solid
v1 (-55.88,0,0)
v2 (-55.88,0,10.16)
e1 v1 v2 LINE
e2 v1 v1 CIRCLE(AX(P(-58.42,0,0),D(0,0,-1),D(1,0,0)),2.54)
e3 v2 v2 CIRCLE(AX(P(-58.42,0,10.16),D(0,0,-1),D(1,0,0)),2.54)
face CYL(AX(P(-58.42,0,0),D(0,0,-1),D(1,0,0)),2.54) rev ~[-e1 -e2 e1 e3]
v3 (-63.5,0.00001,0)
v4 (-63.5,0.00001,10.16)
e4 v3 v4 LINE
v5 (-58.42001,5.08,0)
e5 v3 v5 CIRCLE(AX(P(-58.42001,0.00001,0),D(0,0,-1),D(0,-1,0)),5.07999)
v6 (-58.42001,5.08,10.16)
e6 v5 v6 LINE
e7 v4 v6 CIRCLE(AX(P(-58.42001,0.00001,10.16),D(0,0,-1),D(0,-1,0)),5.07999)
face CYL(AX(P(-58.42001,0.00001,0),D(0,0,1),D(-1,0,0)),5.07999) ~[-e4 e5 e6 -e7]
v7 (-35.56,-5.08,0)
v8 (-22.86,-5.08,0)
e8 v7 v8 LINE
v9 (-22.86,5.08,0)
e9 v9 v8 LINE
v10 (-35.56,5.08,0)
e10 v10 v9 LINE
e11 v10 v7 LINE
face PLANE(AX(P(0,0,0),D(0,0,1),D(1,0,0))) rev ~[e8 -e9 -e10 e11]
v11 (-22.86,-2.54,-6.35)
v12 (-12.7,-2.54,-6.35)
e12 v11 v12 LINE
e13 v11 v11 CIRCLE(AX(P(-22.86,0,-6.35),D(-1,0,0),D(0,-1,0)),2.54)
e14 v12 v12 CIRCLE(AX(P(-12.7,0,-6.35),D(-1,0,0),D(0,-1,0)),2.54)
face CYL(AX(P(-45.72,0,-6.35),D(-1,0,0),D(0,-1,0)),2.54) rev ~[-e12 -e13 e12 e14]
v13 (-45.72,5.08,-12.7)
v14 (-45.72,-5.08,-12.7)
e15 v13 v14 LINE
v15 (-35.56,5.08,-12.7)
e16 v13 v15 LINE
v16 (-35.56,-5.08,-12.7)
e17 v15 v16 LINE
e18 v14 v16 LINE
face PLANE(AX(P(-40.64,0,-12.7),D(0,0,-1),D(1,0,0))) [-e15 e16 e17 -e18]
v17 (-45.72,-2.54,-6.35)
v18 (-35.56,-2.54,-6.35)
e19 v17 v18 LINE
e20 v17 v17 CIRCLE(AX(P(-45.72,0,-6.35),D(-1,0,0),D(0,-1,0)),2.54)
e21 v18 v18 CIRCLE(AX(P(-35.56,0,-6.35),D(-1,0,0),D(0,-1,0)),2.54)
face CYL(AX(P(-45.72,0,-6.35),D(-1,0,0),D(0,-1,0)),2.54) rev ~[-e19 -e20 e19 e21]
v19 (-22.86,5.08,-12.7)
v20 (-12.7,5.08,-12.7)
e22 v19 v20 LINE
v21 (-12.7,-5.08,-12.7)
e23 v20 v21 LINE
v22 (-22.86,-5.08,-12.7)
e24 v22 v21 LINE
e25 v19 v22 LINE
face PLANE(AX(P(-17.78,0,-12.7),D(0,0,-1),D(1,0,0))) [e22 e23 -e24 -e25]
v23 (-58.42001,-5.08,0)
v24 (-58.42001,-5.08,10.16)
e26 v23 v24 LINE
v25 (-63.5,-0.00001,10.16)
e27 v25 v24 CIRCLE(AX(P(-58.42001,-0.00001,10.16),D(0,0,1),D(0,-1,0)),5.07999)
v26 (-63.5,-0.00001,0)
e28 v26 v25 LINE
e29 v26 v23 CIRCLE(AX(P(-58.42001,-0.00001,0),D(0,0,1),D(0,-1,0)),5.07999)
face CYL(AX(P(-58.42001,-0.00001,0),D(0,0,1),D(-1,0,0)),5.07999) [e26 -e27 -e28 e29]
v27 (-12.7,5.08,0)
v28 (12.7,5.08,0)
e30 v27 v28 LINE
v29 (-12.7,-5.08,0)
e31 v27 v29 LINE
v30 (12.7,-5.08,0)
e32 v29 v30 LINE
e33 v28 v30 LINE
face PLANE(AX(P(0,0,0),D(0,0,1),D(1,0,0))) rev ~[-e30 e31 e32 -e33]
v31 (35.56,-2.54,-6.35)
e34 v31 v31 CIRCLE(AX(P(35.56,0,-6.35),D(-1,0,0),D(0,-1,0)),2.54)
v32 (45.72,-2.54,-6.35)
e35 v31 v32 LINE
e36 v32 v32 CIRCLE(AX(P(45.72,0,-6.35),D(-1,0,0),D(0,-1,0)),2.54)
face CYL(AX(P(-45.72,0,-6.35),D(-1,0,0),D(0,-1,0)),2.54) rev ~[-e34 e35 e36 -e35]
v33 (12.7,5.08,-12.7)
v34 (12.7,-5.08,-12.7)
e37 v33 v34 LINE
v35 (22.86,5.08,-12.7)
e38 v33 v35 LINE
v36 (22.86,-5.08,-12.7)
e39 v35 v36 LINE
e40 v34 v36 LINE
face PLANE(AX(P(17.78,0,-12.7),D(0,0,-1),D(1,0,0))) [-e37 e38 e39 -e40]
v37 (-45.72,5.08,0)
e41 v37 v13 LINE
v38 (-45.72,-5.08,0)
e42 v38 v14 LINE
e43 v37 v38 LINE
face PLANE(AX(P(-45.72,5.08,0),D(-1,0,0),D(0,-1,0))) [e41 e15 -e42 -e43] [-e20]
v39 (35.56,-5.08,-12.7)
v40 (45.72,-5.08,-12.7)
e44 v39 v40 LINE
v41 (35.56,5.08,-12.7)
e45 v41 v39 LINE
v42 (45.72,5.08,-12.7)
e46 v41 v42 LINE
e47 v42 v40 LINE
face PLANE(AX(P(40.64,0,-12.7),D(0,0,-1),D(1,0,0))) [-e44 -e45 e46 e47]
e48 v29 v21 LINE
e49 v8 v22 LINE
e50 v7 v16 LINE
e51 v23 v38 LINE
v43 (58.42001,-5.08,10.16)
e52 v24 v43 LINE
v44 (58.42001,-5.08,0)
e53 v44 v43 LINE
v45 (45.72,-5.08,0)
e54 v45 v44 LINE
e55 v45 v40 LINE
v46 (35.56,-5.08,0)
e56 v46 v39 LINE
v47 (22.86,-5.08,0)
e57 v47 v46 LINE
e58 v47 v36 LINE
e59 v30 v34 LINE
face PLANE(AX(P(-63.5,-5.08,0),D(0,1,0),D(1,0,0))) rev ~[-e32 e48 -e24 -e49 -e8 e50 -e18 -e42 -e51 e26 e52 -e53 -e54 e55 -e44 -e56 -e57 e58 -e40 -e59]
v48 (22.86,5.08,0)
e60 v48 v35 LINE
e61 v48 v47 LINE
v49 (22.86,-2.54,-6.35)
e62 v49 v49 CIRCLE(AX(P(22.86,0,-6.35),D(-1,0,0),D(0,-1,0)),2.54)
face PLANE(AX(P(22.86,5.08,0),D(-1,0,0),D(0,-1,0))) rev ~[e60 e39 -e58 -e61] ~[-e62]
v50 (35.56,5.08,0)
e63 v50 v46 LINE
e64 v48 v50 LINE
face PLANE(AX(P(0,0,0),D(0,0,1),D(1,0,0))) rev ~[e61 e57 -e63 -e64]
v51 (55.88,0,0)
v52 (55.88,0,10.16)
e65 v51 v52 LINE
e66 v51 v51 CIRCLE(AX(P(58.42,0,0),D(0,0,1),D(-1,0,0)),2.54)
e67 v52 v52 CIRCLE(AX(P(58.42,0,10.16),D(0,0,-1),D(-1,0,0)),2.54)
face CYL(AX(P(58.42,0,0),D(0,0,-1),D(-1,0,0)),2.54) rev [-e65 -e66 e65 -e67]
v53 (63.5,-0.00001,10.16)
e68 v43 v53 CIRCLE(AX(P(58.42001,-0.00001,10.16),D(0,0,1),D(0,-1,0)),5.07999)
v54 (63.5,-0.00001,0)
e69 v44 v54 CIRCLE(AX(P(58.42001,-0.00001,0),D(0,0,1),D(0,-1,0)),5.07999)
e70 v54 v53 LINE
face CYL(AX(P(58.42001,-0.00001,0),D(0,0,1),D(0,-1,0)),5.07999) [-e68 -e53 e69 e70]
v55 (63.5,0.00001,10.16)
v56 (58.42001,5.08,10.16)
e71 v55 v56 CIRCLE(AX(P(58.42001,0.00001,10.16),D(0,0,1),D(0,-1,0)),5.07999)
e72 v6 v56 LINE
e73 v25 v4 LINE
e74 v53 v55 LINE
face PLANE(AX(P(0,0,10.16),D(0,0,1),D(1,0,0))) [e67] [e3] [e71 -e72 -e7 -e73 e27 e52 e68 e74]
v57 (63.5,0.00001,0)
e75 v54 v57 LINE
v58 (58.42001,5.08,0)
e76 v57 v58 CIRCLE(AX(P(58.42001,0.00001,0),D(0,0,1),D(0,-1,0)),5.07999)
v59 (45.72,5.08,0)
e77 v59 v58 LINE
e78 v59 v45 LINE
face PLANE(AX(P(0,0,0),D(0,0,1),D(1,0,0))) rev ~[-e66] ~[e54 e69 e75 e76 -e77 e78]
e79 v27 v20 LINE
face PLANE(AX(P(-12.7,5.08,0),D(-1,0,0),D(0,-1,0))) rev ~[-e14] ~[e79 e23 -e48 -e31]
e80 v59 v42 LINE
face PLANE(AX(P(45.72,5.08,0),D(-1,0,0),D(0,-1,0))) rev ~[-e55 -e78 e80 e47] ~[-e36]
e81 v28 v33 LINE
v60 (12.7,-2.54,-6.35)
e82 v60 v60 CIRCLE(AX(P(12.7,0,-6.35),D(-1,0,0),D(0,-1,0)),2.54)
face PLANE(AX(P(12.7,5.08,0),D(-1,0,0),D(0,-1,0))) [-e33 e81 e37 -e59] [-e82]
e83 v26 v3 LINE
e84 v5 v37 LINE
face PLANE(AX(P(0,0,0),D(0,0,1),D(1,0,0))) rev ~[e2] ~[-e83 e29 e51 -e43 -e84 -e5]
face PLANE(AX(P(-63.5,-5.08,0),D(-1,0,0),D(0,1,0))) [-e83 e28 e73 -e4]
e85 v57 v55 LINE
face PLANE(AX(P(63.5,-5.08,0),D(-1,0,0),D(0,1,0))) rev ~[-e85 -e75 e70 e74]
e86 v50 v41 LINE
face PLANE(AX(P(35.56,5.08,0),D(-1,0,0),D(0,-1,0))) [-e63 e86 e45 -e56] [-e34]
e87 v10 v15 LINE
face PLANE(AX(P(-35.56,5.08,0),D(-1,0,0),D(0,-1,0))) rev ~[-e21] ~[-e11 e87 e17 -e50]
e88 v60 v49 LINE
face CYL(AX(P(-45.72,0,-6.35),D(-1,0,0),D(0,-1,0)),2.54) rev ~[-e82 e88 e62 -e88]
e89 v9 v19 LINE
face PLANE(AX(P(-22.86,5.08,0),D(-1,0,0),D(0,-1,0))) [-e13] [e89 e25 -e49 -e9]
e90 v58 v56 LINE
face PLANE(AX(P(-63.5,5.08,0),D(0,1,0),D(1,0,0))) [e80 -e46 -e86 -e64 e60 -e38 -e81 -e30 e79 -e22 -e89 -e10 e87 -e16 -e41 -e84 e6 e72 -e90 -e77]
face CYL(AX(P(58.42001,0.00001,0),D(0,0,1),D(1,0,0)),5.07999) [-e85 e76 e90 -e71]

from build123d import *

# Parameters (mm, degrees)
F0_W     = 127
F0_H     = 10.16
F1_DEPTH = 10.16
F2_R     = 5.07999
F3_R     = 2.54
F4_DEPTH = 25.4
F5_W     = 10.16
F5_H     = 10.16
F6_DEPTH = 12.7
F7_R     = 2.54
F8_DEPTH = 99.822


# Not quite as in the source:
# - a fillet or chamfer is up to 0.001 mm smaller than in the source, because OpenCascade refuses the exact size
# - a pattern or mirror of a feature is missing from the dataset's text; its kind, count and spacing are read off the source's solid


with BuildPart() as f1:
    # F0 (on Top) → F1 (new body)
    with BuildSketch(Plane.XY):
        Rectangle(F0_W, F0_H)
    extrude(amount=F1_DEPTH)

    # F2 (radius 5.08 in the source; OpenCascade refuses exactly that, so slightly less here)
    f2_edges = [f1.edges().sort_by_distance(p)[0] for p in [
        (-63.5, -5.08, 5.08),
        (-63.5, 5.08, 5.08),
        (63.5, -5.08, 5.08),
        (63.5, 5.08, 5.08),
    ]]
    fillet(f2_edges, radius=F2_R)

    # F3 (on face) → F4 (cut)
    with BuildSketch(Plane(origin=(0, 0, 0), x_dir=(1, 0, 0), z_dir=(0, 0, -1))):
        with Locations((-58.42, 0)):
            Circle(F3_R)
    f4 = extrude(amount=-F4_DEPTH, mode=Mode.SUBTRACT)

    # F4_copies: F4 across plane
    add(f4.mirror(Plane(origin=(0, 0, 0), x_dir=(0, 0, 1), z_dir=(1, 0, 0))), mode=Mode.SUBTRACT)

    # F5 (on face) → F6 (join)
    with BuildSketch(Plane(origin=(0, 0, 0), x_dir=(1, 0, 0), z_dir=(0, 0, -1))):
        with Locations((-40.64, 0)):
            Rectangle(F5_W, F5_H)
        with Locations((-17.78, 0)):
            Rectangle(F5_W, F5_H)
        with Locations((17.78, 0)):
            Rectangle(F5_W, F5_H)
        with Locations((40.64, 0)):
            Rectangle(F5_W, F5_H)
    extrude(amount=F6_DEPTH)

    # F7 (on face) → F8 (cut)
    with BuildSketch(Plane(origin=(-45.72, 0, 0), x_dir=(0, -1, 0), z_dir=(-1, 0, 0))):
        with Locations((0, -6.35)):
            Circle(F7_R)
    extrude(amount=-F8_DEPTH, mode=Mode.SUBTRACT)


solid = f1.part
